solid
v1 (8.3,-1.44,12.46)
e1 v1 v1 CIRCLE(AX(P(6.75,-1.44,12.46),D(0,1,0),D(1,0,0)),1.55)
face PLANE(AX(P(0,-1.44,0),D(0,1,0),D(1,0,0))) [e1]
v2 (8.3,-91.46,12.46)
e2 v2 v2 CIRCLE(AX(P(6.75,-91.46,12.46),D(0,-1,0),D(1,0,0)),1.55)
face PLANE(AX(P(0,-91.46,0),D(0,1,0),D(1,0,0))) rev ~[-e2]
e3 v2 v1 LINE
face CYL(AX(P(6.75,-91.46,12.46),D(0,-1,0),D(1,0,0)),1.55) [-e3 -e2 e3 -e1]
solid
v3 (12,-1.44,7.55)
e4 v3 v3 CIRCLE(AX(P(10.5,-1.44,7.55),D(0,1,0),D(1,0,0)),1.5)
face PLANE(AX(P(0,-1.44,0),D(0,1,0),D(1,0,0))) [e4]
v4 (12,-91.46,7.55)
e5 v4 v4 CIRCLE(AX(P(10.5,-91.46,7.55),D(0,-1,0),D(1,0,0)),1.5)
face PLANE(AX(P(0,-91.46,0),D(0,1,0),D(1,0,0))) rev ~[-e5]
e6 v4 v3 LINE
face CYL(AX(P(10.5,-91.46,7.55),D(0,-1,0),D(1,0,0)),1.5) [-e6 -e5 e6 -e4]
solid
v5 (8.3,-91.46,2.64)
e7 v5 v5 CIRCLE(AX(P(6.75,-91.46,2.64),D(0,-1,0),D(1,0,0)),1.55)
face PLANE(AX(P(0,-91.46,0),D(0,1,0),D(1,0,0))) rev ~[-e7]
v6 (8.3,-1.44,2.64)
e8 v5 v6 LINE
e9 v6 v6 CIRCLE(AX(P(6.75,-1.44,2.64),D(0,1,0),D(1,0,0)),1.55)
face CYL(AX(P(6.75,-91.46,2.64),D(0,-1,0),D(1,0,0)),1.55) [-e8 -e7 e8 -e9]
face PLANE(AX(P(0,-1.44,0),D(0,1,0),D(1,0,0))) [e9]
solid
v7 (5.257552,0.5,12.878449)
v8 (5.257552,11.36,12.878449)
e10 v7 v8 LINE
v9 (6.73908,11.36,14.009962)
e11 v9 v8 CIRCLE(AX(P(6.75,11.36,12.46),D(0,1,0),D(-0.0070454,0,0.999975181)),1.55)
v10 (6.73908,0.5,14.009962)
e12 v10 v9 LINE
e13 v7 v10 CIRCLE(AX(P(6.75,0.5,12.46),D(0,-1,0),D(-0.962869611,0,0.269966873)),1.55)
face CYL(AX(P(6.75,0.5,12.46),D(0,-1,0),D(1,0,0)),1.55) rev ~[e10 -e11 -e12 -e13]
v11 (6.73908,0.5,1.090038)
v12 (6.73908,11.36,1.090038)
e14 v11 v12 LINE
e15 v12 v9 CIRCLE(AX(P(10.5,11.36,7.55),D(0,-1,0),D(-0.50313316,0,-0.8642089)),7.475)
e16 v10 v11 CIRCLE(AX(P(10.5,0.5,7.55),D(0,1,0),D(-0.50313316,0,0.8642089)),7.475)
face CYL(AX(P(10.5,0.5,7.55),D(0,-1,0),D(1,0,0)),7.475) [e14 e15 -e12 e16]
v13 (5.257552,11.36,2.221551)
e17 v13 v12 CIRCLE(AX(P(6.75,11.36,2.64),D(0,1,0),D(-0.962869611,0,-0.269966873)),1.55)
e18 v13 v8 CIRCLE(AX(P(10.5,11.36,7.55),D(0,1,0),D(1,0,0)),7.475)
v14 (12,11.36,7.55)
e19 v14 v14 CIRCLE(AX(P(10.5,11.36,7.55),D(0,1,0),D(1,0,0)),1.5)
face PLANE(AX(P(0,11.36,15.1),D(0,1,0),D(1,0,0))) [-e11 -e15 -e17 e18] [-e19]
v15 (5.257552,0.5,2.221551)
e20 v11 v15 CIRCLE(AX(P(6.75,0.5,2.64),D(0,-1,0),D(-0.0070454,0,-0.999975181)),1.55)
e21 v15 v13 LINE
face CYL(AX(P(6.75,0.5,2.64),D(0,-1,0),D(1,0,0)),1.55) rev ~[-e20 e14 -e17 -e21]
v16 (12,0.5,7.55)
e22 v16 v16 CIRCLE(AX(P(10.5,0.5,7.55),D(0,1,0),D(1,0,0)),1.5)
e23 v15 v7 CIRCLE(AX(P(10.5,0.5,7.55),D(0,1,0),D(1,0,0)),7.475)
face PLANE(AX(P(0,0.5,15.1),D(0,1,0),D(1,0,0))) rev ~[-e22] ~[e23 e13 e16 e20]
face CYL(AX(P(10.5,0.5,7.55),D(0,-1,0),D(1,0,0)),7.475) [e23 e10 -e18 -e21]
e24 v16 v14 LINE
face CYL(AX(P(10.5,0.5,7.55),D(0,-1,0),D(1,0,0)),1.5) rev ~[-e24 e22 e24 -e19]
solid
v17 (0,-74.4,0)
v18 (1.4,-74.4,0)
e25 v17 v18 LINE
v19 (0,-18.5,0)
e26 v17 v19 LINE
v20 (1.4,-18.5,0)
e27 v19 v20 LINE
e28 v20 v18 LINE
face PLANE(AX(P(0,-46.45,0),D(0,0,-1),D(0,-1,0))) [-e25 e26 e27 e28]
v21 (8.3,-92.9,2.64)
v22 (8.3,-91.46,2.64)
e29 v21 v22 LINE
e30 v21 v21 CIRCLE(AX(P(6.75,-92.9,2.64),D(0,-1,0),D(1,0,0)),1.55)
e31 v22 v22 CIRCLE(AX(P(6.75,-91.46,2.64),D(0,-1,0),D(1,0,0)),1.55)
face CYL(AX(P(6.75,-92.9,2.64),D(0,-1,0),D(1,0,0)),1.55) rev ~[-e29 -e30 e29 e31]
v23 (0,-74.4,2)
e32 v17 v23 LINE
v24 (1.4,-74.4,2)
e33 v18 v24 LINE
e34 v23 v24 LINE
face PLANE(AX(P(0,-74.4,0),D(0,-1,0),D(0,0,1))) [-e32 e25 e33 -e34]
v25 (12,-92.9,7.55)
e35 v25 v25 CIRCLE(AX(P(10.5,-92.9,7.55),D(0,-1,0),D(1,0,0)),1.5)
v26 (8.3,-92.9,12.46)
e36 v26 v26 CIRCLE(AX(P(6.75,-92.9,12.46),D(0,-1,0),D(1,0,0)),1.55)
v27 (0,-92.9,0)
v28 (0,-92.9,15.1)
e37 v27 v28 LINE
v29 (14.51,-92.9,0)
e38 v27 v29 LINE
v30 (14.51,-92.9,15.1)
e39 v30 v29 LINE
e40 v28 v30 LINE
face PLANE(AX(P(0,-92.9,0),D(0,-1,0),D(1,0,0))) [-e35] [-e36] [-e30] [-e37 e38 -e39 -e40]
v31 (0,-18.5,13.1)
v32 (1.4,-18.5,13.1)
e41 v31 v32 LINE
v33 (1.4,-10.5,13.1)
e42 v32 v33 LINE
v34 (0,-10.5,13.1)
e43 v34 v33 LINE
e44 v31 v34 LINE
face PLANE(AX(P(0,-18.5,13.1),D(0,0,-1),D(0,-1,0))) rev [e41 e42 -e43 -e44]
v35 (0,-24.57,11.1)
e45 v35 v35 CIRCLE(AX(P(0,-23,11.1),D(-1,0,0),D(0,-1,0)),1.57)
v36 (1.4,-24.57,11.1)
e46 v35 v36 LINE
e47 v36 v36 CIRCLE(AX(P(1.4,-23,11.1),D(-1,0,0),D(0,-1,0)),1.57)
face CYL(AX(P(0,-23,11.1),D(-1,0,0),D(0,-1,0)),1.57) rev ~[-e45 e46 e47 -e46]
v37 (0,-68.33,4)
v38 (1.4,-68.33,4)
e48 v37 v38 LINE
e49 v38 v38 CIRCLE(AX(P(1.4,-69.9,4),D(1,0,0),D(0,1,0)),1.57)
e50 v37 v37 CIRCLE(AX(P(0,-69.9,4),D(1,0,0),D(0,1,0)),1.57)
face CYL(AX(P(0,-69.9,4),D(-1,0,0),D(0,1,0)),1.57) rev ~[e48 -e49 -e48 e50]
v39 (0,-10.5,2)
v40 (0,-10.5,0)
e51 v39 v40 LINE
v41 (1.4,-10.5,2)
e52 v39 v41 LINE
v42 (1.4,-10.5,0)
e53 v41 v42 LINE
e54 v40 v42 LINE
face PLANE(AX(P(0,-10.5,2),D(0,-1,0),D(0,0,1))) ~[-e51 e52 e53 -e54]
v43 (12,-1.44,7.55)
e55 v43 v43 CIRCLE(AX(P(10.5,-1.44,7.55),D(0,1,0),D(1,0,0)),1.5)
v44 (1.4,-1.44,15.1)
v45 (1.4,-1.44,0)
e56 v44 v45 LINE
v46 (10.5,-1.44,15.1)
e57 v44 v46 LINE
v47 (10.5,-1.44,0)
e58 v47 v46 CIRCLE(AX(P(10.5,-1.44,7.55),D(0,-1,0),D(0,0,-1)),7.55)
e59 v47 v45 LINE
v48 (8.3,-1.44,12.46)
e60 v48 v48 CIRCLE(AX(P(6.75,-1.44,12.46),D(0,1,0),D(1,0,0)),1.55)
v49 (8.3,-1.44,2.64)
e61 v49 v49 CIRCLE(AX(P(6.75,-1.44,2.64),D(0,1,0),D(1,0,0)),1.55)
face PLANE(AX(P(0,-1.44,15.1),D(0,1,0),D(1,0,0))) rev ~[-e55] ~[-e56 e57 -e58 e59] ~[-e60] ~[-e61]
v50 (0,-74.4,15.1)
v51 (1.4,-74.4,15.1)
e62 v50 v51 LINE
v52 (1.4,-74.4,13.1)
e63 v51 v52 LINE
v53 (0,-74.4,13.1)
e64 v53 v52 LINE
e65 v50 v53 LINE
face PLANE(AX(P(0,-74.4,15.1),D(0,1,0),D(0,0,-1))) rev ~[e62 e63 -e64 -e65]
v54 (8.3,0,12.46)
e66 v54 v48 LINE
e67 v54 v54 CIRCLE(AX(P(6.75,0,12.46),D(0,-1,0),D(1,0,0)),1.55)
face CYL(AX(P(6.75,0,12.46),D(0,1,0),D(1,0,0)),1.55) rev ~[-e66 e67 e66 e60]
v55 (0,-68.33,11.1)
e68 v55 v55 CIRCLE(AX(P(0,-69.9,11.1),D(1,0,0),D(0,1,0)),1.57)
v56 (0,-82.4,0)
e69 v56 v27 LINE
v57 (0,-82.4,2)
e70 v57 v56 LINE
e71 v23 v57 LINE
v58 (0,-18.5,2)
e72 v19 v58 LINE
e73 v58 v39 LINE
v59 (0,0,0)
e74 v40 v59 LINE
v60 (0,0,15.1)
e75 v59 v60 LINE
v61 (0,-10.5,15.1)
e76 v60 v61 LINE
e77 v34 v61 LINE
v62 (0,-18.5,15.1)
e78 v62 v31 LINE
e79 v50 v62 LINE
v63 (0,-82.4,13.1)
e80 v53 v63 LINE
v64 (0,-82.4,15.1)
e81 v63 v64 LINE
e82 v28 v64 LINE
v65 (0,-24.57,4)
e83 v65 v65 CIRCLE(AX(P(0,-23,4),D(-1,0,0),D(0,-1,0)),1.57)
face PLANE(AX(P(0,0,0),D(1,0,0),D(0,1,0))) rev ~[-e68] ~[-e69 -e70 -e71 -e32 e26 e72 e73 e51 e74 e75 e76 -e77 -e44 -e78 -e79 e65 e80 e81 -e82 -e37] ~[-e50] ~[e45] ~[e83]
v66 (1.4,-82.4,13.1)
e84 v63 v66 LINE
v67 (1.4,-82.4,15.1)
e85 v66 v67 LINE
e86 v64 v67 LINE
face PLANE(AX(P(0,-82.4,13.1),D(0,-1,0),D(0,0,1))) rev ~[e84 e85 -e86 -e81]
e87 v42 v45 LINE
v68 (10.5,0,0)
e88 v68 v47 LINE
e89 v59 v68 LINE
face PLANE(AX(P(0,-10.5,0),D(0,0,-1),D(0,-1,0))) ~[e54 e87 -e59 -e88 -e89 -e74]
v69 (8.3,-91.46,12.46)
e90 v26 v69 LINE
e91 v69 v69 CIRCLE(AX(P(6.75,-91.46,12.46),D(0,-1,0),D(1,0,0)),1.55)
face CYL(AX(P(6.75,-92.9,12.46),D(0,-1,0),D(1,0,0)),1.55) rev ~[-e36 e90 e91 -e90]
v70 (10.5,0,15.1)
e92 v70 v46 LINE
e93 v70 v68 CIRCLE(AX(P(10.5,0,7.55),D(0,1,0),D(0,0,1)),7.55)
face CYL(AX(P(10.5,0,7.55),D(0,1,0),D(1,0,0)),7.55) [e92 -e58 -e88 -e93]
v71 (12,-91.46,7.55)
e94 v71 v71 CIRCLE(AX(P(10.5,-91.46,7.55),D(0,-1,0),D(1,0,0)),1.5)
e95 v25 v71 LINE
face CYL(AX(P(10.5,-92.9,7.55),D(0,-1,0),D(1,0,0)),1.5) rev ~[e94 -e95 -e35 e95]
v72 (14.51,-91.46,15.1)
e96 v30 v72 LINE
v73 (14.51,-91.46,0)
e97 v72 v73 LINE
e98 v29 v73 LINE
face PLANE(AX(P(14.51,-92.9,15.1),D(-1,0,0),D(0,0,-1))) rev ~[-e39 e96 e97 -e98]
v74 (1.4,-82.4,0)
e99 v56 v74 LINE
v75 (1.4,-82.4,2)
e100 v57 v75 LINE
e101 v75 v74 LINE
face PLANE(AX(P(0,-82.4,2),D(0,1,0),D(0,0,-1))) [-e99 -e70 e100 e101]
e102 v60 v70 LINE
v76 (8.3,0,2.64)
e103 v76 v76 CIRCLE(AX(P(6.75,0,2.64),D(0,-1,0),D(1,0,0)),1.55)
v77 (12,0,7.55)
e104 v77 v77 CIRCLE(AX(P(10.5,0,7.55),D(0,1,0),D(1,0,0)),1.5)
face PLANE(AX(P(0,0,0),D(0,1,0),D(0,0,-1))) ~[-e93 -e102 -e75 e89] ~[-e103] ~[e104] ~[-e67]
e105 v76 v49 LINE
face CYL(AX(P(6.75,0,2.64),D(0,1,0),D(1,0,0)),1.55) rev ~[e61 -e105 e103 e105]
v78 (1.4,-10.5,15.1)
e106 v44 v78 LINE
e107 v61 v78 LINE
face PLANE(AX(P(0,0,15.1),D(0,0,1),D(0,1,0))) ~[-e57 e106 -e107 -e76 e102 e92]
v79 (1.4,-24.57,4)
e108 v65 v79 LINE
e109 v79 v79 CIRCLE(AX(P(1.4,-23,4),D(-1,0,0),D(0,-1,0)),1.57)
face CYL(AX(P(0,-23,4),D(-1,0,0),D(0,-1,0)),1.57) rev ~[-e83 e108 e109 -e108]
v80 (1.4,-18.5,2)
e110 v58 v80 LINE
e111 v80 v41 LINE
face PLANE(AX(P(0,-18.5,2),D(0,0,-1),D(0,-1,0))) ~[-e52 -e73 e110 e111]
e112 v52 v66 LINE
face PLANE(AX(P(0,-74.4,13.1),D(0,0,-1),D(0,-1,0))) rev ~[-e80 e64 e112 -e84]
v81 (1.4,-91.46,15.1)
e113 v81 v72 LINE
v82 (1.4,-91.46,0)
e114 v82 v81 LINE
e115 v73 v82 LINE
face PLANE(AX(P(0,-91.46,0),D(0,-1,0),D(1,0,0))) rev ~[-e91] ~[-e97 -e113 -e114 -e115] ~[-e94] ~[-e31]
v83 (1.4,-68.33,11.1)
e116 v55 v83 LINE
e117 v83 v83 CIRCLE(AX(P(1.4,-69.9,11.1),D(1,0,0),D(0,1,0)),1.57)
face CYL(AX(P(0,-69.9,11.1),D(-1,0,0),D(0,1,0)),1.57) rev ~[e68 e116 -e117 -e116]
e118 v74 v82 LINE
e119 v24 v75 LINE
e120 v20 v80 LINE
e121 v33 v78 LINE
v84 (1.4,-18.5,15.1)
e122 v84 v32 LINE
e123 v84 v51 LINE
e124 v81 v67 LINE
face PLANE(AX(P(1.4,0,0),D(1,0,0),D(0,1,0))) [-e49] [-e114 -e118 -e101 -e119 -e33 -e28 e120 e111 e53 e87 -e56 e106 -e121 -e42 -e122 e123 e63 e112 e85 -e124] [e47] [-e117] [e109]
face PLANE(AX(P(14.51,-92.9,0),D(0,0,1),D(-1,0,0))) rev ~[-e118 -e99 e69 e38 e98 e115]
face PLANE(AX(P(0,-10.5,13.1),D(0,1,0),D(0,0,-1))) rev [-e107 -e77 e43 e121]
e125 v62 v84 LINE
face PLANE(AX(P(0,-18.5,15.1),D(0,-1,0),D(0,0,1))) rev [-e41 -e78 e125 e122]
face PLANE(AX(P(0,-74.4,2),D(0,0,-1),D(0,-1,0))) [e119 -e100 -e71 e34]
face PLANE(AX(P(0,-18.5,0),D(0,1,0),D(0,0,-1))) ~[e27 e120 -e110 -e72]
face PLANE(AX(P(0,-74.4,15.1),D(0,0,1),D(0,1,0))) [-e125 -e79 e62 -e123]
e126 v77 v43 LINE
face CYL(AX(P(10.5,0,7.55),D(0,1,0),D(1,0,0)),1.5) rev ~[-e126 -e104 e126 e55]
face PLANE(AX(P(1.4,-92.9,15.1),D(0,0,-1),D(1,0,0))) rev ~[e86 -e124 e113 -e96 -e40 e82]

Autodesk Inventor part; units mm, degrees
ref_plane "YZ Plane" through (0, 0, 0) normal (1, 0, 0) x (0, 1, 0)
ref_plane "XZ Plane" through (0, 0, 0) normal (0, 1, 0) x (-1, 0, 0)
ref_plane "XY Plane" through (0, 0, 0) normal (0, 0, 1) x (1, 0, 0)
sketch "Skizze1" plane through (0, 0, 0) normal (1, 0, 0) x (0, 1, 0)
  line L0 (0, 0) -> (-92.9, 0)
  line L1 (-92.9, 0) -> (-92.9, 15.1)
  line L2 (-92.9, 15.1) -> (0, 15.1)
  line L3 (0, 15.1) -> (0, 0)
  line L4 (-46.45, 15.1) -> (-46.45, 0)
  circle A0 centre (-69.9, 11.1) radius 1.57
  circle A1 centre (-69.9, 4) radius 1.57
  line L5 (-82.4, 15.1) -> (-74.4, 15.1)
  line L6 (-74.4, 15.1) -> (-74.4, 13.1)
  line L7 (-74.4, 13.1) -> (-82.4, 13.1)
  line L8 (-82.4, 13.1) -> (-82.4, 15.1)
  line L9 (-82.4, 0) -> (-74.4, 0)
  line L10 (-74.4, 0) -> (-74.4, 2)
  line L11 (-74.4, 2) -> (-82.4, 2)
  line L12 (-82.4, 2) -> (-82.4, 0)
  dimension "d0" = 92.9
  dimension "d1" = 15.1
  dimension "d2" = 3.14
  dimension "d3" = 3.14
  dimension "d4" = 23
  dimension "d5" = 23
  dimension "d6" = 4
  dimension "d7" = 4
  dimension "d8" = 8
  dimension "d9" = 2
  dimension "d10" = 10.5
  dimension "d11" = 2
extrude "Extrusion1" add sketch "Skizze1" along normal blind 1.4 contours L0 L10 L11 L12 L1 L2 L8 L7 L6 L4
mirror "Spiegeln1" about plane through (0, -46.45, 0) normal (0, 1, 0) of "Extrusion1"
sketch "Skizze2" plane through (0, -92.9, 0) normal (0, -1, 0) x (1, 0, 0)
  line L0 (0, 15.1) -> (0, 0) projected
  line L1 (0, 0) -> (1.4, 0) projected
  line L2 (1.4, 15.1) -> (1.4, 0) projected
  line L3 (0, 15.1) -> (1.4, 15.1) projected
  circle A0 centre (10.5, 7.55) radius 1.5
  circle A1 centre (6.75, 12.46) radius 1.55
  circle A2 centre (6.75, 2.64) radius 1.55
  line L4 (1.4, 15.1) -> (1.4, 13.1) projected
  line L5 (1.4, 15.1) -> (14.51, 15.1)
  line L6 (14.51, 15.1) -> (14.51, 0)
  line L7 (14.51, 0) -> (1.4, 0)
  line L8 (1.4, 0) -> (1.4, 15.1)
  dimension "d14" = 3
  dimension "d15" = 10.5
  dimension "d16" = 3.1
  dimension "d17" = 3.1
  dimension "d18" = 6.75
  dimension "d19" = 6.75
  dimension "d20" = 2.64
  dimension "d21" = 2.64
  dimension "d22" = 13.11
extrude "Extrusion2" add sketch "Skizze2" against normal blind 1.44 contours L5 L6 L7 L2
sketch "Skizze3" plane through (0, 0, 15.1) normal (0, 1, 0) x (1, 0, 0)
  line L0 (0, 0) -> (0, 15.1) projected
  line L1 (0, 0) -> (1.4, 0) projected
  line L2 (1.4, 0) -> (1.4, 15.1) projected
  line L3 (0, 15.1) -> (1.4, 15.1) projected
  line L4 (14.51, 0) -> (14.51, 15.1) projected
  line L5 (14.51, 15.1) -> (1.4, 15.1) projected
  line L6 (1.4, 0) -> (1.4, 15.1) projected
  line L7 (1.4, 0) -> (14.51, 0) projected
  circle A0 centre (10.5, 7.55) radius 1.5 projected
  circle A1 centre (6.75, 2.64) radius 1.55 projected
  circle A2 centre (6.75, 12.46) radius 1.55 projected
  circle A3 centre (10.5, 7.55) radius 7.55
  point P0 (10.5, 15.1)
  point P1 (10.5, 0)
extrude "Extrusion3" add sketch "Skizze3" against normal blind 1.44 contours L2 L5 A3 A2 A1 L7 | A3 A1 A2 L4 | L4 A3
ref_plane "Arbeitsebene1" through (0, 0.5, 15.1) normal (0, 1, 0) x (1, 0, 0)
sketch "Skizze4" plane through (0, 0.5, 15.1) normal (0, 1, 0) x (1, 0, 0)
  circle A0 centre (10.5, 7.55) radius 1.5 projected
  circle A1 centre (6.75, 2.64) radius 1.55 projected
  circle A2 centre (6.75, 12.46) radius 1.55 projected
  line L0 (0, 0) -> (0, 15.1) projected
  line L1 (0, 0) -> (10.5, 0) projected
  arc A3 (10.5, 0) -> (10.5, 15.1) centre (10.5, 7.55) ccw projected
  line L2 (0, 15.1) -> (10.5, 15.1) projected
  circle A4 centre (10.5, 7.55) radius 1.5 projected
  circle A5 centre (10.5, 7.55) radius 7.475
  dimension "d28" = 14.95
extrude "Extrusion4" add sketch "Skizze4" along normal blind 10.86 contours A1 A5 A2
sketch "Skizze5" plane through (0, -91.46, 0) normal (0, 1, 0) x (1, 0, 0)
  line L0 (14.51, -15.1) -> (14.51, 0) projected
  line L1 (14.51, 0) -> (1.4, 0) projected
  line L2 (1.4, -15.1) -> (1.4, 0) projected
  line L3 (1.4, -15.1) -> (14.51, -15.1) projected
  circle A0 centre (10.5, -7.55) radius 1.5 projected
  circle A1 centre (6.75, -12.46) radius 1.55 projected
  circle A2 centre (6.75, -2.64) radius 1.55 projected
  point P0 (0, 0)
extrude "Extrusion5" add sketch "Skizze5" along normal up to surface (90.02 mm away) contours A0 | A1 | A2
equation "\"d16\" = d17"
properties part number "00_Linear_Stepper_90mm"
